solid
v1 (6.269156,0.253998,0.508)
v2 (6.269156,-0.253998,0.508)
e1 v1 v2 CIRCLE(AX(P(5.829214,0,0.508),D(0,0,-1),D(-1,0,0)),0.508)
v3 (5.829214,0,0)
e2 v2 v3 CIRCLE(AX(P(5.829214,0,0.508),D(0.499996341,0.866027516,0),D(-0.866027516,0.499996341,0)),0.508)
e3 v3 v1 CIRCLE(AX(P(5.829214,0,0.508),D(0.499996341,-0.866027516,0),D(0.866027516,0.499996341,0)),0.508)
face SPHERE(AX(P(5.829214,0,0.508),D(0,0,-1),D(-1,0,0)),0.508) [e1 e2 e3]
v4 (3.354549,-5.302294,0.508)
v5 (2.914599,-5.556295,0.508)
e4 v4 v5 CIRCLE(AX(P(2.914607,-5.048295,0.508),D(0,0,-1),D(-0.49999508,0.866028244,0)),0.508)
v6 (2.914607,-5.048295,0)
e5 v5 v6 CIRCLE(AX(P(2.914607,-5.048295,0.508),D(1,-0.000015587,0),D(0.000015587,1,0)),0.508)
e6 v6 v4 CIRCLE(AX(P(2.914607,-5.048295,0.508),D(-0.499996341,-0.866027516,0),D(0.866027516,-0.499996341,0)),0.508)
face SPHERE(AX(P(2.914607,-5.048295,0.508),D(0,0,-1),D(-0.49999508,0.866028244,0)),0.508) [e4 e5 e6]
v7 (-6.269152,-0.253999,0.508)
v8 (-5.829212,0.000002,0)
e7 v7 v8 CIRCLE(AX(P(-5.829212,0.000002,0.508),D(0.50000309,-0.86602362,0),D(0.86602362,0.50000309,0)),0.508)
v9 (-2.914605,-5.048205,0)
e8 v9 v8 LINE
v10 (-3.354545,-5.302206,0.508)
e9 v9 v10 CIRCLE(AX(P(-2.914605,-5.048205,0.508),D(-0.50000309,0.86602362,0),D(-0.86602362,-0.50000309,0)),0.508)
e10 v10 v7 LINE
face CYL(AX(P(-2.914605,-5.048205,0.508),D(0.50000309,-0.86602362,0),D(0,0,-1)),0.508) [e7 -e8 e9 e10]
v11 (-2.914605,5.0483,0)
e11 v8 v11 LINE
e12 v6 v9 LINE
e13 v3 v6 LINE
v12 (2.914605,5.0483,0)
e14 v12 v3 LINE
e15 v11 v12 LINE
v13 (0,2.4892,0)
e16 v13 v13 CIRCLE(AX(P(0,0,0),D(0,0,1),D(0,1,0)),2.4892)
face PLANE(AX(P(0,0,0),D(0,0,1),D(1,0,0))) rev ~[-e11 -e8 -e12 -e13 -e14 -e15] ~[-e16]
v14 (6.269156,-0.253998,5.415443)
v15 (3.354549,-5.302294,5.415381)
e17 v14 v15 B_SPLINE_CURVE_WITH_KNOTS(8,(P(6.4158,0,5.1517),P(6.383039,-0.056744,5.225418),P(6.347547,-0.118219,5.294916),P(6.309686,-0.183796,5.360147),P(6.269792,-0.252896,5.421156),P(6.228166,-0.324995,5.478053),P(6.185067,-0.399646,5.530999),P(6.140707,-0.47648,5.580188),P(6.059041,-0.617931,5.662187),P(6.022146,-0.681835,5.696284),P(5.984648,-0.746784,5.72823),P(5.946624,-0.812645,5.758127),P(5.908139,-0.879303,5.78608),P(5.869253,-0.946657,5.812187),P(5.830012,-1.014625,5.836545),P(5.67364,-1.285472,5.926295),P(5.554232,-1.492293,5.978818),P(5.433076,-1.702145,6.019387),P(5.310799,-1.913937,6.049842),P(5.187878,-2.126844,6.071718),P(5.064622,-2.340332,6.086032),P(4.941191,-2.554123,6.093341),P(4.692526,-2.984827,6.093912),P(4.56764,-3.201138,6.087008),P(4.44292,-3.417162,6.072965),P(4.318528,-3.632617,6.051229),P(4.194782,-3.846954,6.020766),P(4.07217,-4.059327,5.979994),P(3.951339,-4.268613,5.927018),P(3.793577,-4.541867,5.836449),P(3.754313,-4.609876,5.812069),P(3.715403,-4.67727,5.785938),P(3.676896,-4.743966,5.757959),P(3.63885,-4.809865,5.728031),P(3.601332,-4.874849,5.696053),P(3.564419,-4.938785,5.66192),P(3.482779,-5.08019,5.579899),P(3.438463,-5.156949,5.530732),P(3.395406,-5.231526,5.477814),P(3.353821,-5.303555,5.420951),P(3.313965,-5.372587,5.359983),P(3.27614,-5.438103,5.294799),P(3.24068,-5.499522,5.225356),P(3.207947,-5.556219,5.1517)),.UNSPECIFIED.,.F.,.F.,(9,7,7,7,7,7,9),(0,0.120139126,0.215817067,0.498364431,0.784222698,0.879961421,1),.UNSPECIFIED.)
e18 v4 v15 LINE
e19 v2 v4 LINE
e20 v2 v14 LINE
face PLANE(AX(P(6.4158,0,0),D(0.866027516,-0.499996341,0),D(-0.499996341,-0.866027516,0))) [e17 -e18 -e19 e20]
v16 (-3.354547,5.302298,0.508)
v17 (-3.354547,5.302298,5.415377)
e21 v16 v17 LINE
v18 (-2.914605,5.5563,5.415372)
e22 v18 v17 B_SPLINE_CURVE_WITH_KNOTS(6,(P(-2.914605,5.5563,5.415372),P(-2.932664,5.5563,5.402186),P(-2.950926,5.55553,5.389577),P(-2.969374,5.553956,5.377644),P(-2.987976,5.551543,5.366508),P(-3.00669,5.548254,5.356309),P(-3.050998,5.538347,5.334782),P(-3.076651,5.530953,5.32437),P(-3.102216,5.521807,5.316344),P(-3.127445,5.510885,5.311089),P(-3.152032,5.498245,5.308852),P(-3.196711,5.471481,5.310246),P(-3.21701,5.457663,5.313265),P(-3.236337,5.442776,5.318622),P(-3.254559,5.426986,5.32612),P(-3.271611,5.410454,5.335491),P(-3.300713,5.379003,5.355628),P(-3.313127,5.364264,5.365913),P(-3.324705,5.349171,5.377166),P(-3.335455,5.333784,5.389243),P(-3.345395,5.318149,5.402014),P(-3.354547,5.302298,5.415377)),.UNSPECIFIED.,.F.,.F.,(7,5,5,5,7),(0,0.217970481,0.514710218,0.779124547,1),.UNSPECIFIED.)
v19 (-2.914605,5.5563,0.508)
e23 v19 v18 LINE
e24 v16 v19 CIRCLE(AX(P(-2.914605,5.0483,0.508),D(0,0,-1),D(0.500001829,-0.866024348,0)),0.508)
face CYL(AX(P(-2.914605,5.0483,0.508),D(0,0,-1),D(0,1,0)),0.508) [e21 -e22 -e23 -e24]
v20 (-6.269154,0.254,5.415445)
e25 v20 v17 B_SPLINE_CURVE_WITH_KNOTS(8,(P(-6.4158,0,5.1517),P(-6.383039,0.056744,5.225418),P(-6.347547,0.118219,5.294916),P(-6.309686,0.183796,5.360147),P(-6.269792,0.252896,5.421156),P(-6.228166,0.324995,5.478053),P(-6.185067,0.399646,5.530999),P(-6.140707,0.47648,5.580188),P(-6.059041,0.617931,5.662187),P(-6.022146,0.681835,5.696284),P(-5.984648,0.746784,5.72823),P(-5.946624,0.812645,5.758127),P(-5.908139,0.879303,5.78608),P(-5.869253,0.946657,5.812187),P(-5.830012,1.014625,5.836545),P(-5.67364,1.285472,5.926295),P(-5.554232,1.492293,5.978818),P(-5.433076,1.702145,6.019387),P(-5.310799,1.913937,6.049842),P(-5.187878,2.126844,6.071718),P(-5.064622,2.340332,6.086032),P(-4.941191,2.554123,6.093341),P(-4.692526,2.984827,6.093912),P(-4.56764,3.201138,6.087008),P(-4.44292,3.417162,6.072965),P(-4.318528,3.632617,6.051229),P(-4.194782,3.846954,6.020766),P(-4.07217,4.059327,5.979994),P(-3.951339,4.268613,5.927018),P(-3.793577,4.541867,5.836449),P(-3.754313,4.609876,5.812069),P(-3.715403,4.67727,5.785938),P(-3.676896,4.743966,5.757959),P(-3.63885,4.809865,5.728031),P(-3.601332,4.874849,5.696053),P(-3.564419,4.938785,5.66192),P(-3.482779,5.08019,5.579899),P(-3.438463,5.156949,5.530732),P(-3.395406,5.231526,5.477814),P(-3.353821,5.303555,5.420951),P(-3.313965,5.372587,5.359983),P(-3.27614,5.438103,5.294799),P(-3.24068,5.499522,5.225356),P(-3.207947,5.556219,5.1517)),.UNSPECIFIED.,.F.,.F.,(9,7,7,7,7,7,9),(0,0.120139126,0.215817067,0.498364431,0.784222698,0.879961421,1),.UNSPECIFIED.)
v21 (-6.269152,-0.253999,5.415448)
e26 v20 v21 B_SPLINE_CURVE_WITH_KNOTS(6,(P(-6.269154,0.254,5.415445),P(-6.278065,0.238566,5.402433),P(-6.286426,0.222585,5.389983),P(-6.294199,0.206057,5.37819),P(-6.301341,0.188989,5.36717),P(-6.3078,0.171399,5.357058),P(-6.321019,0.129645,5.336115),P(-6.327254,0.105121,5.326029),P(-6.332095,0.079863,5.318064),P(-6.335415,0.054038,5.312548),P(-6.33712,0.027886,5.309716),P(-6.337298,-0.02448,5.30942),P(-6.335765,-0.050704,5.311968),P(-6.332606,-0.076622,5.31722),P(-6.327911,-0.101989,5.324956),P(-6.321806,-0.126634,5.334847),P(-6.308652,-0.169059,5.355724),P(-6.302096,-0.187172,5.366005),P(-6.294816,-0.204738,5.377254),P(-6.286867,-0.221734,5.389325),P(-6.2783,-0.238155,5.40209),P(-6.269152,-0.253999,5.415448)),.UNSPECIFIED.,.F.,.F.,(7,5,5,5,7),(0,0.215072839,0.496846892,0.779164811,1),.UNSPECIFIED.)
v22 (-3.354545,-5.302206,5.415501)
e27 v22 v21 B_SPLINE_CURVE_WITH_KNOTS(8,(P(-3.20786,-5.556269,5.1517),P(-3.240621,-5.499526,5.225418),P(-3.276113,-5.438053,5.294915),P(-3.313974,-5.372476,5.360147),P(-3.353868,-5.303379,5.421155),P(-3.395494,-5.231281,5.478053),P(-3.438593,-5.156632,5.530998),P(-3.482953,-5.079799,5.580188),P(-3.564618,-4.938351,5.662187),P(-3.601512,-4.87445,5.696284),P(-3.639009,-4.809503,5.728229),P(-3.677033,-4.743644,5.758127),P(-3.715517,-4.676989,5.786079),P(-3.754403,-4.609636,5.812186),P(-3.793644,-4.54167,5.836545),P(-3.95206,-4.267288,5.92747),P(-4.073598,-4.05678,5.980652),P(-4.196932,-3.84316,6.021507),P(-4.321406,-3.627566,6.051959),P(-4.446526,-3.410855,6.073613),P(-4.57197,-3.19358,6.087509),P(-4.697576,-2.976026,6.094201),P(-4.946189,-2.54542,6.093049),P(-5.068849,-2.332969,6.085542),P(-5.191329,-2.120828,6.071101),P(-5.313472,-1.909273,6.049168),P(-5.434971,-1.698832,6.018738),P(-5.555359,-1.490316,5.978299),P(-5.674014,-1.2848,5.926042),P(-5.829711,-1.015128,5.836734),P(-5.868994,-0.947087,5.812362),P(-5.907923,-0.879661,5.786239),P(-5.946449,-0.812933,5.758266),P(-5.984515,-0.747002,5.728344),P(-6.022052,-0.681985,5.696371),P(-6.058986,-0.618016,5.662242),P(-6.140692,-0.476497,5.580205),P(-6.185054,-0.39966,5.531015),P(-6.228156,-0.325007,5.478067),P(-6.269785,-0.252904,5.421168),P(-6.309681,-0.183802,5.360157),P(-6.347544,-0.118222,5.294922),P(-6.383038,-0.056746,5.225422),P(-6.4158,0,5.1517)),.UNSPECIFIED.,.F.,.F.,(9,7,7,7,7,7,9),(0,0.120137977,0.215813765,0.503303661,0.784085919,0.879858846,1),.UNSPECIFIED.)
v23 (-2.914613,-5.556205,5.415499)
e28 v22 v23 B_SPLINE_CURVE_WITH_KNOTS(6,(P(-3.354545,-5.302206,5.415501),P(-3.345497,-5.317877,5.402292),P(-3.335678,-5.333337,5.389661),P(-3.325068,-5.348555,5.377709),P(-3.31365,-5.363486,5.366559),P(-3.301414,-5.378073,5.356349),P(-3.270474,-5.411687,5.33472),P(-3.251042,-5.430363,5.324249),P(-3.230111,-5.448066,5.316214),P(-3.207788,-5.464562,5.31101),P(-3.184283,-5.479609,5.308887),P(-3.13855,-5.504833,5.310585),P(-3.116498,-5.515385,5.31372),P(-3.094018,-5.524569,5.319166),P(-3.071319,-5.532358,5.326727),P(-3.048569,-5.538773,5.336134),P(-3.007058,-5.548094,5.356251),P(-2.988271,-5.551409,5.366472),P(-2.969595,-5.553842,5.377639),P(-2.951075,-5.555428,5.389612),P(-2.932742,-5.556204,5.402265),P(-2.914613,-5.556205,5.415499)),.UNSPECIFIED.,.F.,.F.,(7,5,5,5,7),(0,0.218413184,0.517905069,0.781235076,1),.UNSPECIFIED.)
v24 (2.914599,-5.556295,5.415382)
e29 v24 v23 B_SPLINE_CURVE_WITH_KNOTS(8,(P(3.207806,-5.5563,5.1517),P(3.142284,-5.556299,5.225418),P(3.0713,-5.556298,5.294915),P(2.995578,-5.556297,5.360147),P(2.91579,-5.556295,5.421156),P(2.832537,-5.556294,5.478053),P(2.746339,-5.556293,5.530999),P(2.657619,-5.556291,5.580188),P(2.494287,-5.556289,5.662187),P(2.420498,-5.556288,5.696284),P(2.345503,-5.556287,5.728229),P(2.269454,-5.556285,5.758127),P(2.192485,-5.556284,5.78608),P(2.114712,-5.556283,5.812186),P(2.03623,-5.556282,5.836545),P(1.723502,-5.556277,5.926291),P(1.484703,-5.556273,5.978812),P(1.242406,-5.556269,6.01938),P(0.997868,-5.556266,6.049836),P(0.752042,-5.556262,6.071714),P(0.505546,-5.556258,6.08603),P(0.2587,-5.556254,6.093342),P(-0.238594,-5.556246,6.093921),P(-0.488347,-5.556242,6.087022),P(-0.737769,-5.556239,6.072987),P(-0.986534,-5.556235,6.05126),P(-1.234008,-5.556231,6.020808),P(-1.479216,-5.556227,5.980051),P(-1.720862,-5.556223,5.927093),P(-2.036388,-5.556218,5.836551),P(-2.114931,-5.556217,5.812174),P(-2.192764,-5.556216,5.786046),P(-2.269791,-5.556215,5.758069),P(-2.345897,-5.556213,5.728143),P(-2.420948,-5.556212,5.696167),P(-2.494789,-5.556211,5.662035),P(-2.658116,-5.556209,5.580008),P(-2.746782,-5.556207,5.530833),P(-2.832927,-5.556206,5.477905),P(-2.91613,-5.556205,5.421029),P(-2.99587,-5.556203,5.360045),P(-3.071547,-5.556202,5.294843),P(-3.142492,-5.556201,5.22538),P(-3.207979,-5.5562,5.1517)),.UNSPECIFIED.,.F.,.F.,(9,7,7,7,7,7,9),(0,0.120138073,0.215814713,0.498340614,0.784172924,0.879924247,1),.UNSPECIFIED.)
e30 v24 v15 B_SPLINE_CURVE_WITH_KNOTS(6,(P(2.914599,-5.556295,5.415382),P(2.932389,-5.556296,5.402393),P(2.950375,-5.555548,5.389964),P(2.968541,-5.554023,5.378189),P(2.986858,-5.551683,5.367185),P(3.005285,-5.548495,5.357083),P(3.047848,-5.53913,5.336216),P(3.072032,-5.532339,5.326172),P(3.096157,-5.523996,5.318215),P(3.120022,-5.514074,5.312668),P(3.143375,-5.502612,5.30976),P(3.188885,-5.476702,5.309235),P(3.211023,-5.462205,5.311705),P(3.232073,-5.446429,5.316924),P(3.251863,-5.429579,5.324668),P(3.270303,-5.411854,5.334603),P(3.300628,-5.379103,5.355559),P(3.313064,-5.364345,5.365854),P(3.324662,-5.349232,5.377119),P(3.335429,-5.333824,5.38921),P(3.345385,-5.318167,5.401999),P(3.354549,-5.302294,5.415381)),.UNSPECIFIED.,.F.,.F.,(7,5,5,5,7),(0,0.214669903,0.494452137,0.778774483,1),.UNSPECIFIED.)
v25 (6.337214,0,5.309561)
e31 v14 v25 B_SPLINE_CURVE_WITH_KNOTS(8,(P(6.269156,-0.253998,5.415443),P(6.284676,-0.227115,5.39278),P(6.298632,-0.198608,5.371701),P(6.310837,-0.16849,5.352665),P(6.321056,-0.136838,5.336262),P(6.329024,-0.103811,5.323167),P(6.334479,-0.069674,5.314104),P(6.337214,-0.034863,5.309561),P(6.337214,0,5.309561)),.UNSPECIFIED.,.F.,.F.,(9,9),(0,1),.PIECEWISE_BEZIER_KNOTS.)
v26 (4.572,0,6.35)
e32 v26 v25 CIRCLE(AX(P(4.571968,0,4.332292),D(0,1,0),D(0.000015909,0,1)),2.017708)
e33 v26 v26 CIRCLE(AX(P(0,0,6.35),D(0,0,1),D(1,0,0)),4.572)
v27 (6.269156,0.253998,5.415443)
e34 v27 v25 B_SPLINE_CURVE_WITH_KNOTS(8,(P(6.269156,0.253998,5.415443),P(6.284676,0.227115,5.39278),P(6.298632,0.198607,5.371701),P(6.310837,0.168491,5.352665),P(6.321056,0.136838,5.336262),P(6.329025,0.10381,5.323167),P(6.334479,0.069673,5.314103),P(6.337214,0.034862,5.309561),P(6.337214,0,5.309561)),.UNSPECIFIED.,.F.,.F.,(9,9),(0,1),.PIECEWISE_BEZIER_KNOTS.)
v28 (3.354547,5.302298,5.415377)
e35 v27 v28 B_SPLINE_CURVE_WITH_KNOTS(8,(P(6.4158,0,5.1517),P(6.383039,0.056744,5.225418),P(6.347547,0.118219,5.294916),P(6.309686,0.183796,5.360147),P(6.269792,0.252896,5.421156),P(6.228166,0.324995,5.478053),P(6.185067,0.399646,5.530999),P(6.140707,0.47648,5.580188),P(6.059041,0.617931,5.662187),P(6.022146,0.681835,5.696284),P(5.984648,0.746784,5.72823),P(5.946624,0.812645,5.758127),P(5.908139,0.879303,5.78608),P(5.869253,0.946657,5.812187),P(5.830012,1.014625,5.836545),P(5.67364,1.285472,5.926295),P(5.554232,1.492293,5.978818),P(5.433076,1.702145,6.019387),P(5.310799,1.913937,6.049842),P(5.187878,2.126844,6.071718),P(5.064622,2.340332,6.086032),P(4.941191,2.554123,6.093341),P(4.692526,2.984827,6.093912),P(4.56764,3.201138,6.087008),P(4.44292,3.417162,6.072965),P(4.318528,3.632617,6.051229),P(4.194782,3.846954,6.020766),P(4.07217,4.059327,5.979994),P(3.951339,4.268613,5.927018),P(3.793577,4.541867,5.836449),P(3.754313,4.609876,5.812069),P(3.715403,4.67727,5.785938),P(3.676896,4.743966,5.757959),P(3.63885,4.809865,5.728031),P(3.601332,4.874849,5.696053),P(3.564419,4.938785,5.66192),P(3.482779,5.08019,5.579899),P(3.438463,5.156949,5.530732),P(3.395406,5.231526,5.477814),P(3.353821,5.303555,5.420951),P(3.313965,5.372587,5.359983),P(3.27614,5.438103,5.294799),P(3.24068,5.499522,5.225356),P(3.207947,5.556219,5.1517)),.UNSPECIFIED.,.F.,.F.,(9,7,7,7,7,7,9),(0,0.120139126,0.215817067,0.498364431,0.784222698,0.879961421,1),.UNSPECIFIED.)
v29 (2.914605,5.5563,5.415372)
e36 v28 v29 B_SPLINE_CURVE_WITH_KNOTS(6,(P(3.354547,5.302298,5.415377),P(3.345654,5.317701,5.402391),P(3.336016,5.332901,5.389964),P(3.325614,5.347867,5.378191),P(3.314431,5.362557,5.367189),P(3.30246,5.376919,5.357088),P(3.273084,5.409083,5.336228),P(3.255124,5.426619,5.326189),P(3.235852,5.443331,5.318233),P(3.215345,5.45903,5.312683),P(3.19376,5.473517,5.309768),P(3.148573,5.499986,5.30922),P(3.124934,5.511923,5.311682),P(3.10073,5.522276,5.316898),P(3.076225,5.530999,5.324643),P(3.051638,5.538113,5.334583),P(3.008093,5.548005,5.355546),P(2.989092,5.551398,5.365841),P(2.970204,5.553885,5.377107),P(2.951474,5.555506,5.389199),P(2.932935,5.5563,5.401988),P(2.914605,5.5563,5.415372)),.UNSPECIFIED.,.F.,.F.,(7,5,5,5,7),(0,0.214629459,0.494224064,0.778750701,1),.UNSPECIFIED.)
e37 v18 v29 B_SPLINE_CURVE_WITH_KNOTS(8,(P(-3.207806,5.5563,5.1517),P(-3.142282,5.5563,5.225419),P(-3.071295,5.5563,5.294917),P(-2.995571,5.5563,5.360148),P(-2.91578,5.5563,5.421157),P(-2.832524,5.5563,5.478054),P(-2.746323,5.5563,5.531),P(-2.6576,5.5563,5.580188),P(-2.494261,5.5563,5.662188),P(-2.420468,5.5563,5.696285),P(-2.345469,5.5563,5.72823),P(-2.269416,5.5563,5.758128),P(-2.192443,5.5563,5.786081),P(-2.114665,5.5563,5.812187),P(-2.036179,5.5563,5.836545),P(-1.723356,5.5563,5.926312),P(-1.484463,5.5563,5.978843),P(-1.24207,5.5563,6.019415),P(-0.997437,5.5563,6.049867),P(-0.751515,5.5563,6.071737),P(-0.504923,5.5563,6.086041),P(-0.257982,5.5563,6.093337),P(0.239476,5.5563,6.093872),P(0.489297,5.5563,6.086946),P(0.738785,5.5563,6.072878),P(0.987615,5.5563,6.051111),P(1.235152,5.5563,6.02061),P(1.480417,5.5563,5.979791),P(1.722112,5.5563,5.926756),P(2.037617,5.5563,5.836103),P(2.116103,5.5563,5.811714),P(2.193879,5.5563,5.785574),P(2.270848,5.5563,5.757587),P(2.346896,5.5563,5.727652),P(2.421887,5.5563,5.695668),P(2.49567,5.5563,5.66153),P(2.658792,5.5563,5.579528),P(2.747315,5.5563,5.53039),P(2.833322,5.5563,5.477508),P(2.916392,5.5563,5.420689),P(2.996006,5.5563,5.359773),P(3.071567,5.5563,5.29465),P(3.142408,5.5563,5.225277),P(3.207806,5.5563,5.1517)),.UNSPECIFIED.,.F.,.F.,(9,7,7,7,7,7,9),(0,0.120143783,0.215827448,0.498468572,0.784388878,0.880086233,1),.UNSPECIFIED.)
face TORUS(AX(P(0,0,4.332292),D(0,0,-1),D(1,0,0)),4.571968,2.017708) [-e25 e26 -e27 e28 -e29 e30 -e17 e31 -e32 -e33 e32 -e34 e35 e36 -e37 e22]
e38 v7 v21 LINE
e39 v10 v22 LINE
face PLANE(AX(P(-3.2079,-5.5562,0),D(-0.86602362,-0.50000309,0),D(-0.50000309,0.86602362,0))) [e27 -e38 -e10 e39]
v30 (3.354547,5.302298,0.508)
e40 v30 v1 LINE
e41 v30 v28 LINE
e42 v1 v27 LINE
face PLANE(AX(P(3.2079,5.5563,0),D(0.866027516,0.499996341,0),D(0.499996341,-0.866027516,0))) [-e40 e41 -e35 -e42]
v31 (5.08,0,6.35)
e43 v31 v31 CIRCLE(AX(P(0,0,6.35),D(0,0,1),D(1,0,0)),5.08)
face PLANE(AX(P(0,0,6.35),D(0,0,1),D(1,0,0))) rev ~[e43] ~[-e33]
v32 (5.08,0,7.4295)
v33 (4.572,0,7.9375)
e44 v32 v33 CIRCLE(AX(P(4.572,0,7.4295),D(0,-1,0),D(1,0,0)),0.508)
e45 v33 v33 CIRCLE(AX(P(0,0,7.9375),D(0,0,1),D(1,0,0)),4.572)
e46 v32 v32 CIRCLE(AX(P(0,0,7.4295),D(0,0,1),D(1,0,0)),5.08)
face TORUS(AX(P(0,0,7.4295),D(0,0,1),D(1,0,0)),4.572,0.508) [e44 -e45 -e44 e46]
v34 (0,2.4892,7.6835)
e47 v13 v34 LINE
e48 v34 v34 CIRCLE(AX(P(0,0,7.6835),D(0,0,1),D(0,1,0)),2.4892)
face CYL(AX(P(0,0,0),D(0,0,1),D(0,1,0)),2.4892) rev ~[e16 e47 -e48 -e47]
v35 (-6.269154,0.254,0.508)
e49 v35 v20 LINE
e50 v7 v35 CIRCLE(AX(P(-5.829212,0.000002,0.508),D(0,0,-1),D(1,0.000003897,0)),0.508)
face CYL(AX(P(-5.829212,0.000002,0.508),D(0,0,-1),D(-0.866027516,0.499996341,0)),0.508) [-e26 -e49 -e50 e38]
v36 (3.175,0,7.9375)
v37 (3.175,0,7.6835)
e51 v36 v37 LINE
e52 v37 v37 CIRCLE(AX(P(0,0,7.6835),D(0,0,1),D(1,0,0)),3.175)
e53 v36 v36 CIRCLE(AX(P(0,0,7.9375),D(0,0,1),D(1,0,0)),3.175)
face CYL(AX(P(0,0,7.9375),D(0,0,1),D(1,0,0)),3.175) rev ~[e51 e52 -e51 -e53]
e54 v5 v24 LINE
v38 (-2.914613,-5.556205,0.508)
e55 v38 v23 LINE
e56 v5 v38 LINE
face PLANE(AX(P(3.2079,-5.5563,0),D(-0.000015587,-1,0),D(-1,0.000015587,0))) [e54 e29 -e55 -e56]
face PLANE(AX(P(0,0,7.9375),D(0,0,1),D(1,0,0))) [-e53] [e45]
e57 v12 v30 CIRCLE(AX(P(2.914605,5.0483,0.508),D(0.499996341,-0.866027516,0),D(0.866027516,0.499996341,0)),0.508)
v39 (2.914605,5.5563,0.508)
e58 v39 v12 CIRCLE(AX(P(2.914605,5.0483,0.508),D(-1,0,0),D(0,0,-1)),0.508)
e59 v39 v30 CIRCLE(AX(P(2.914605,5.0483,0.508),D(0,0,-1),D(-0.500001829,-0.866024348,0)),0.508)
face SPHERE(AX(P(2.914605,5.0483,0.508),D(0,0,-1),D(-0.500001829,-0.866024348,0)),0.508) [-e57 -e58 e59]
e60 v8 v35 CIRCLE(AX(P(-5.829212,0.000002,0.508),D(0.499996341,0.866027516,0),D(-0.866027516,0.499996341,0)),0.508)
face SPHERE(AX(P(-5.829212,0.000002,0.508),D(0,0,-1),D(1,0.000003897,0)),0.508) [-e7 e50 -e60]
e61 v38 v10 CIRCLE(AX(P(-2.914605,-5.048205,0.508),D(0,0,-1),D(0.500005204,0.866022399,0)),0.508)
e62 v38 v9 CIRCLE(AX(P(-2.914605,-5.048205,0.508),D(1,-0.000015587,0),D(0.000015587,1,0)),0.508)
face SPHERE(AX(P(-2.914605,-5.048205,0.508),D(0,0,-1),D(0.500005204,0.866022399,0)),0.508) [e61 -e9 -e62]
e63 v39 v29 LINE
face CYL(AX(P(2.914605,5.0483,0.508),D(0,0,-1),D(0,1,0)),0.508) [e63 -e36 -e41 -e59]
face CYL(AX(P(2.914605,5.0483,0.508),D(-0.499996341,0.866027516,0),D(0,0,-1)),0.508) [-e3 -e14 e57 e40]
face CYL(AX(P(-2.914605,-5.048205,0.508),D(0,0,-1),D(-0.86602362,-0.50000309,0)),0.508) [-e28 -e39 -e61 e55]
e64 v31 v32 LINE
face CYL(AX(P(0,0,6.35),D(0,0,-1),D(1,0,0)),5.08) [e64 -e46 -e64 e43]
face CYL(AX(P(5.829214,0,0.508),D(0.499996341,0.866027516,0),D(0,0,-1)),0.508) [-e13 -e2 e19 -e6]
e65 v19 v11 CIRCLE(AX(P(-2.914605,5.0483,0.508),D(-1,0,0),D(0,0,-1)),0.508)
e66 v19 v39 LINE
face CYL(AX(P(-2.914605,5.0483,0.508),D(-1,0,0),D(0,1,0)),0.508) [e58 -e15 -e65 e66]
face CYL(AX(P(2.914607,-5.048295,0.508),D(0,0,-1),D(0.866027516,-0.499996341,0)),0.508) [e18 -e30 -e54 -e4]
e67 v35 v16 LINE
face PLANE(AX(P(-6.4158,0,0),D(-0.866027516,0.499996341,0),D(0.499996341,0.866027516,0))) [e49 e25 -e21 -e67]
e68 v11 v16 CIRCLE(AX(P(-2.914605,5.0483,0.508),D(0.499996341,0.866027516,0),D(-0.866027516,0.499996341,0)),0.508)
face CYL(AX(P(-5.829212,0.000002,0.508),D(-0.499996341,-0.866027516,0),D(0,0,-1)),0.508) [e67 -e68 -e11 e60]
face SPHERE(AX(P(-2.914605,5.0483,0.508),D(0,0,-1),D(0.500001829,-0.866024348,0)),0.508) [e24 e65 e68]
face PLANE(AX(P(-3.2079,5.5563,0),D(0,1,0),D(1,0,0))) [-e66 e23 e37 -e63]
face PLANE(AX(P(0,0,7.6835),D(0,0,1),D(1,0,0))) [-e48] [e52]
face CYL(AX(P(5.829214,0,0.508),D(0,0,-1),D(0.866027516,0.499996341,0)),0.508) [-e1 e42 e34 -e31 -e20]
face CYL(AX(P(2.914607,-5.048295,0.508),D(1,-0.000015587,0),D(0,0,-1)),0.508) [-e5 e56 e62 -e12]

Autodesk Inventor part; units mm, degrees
ref_plane "YZ Plane" through (0, 0, 0) normal (1, 0, 0) x (0, 1, 0)
ref_plane "XZ Plane" through (0, 0, 0) normal (0, 1, 0) x (-1, 0, 0)
ref_plane "XY Plane" through (0, 0, 0) normal (0, 0, 1) x (1, 0, 0)
sketch "Sketch1" plane through (0, 0, 0) normal (0, 0, 1) x (1, 0, 0)
  line L0 (-3.2079, 5.5563) -> (3.2079, 5.5563)
  line L1 (3.2079, 5.5563) -> (6.4158, 0)
  line L2 (6.4158, 0) -> (3.2079, -5.5563)
  line L3 (3.2079, -5.5563) -> (-3.2079, -5.5562)
  line L4 (-3.2079, -5.5562) -> (-6.4158, 0)
  line L5 (-6.4158, 0) -> (-3.2079, 5.5563)
  point P0 (0, 0)
  point P1 (0, 0)
  dimension "d0" = 11.1125
extrude "Extrusion1" add sketch "Sketch1" along normal blind 6.35
sketch "Sketch3" plane through (0, 0, 6.35) normal (0, 0, 1) x (1, 0, 0)
  circle A0 centre (0, 0) radius 5.08
  dimension "d28" = 10.16
extrude "Extrusion2" add sketch "Sketch3" along normal blind 1.5875
sketch "Sketch8" plane through (0, 0, 7.9375) normal (0, 0, 1) x (1, 0, 0)
  circle A0 centre (0, 0) radius 5.08 projected
  circle A1 centre (0, 0) radius 3.175
  dimension "d29" = 6.35
sketch "Sketch9" plane through (0, 0, 0) normal (0, 0, -1) x (-1, 0, 0)
  point P0 (0, 0)
hole "Hole2" at (0, 0, 0) direction (0, 0, 1) diameter 4.9784 end through all thread size "1/4-20 UNC" class "2B" standard "ANSI Unified Screw Threads"
sketch "Sketch10" plane through (0, 0, 0) normal (0, 1, 0) x (-1, 0, 0)
  line L0 (-6.4158, 6.35) -> (-3.2079, 6.35) projected
  line L1 (-3.2079, 0) -> (-3.2079, 6.35) projected
  line L2 (-6.4158, 0) -> (-3.2079, 0) projected
  line L3 (-6.4158, 0) -> (-6.4158, 6.35) projected
  line L4 (0, 0) -> (0, 6.9243)
  arc A0 (-4.572, 6.35) -> (-6.4158, 5.1517) centre (-4.572, 4.3324) ccw
  line L5 (-6.4158, 5.1517) -> (-6.4158, 6.35)
  line L6 (-4.572, 6.35) -> (-6.4158, 6.35)
  dimension "d24" = 4.572
revolve "Revolution2" cut sketch "Sketch10" angle 360 about axis through (0, 0, 0) along (0, 0, 1) contours L0 A0 L3
fillet "Fillet1" radius 0.508 12 edges at (-3.2079, -5.5562, 2.5758) (3.2079, -5.5563, 2.5758) (6.4158, 0, 2.5758) (3.2079, 5.5563, 2.5758) (-6.4158, 0, 2.5758) (-3.2079, 5.5563, 2.5758) (0, 5.5563, 0) (4.8119, 2.7781, 0) (4.8119, -2.7781, 0) (0, -5.5563, 0) (-4.8119, -2.7781, 0) (-4.8119, 2.7781, 0)
fillet "Fillet2" radius 0.508 1 edges at (-5.08, 0, 7.9375)
extrude "Extrusion4" cut sketch "Sketch8" against normal blind 0.254 contours A1
properties part number "14-20 regular lock nut" material "Steel"
